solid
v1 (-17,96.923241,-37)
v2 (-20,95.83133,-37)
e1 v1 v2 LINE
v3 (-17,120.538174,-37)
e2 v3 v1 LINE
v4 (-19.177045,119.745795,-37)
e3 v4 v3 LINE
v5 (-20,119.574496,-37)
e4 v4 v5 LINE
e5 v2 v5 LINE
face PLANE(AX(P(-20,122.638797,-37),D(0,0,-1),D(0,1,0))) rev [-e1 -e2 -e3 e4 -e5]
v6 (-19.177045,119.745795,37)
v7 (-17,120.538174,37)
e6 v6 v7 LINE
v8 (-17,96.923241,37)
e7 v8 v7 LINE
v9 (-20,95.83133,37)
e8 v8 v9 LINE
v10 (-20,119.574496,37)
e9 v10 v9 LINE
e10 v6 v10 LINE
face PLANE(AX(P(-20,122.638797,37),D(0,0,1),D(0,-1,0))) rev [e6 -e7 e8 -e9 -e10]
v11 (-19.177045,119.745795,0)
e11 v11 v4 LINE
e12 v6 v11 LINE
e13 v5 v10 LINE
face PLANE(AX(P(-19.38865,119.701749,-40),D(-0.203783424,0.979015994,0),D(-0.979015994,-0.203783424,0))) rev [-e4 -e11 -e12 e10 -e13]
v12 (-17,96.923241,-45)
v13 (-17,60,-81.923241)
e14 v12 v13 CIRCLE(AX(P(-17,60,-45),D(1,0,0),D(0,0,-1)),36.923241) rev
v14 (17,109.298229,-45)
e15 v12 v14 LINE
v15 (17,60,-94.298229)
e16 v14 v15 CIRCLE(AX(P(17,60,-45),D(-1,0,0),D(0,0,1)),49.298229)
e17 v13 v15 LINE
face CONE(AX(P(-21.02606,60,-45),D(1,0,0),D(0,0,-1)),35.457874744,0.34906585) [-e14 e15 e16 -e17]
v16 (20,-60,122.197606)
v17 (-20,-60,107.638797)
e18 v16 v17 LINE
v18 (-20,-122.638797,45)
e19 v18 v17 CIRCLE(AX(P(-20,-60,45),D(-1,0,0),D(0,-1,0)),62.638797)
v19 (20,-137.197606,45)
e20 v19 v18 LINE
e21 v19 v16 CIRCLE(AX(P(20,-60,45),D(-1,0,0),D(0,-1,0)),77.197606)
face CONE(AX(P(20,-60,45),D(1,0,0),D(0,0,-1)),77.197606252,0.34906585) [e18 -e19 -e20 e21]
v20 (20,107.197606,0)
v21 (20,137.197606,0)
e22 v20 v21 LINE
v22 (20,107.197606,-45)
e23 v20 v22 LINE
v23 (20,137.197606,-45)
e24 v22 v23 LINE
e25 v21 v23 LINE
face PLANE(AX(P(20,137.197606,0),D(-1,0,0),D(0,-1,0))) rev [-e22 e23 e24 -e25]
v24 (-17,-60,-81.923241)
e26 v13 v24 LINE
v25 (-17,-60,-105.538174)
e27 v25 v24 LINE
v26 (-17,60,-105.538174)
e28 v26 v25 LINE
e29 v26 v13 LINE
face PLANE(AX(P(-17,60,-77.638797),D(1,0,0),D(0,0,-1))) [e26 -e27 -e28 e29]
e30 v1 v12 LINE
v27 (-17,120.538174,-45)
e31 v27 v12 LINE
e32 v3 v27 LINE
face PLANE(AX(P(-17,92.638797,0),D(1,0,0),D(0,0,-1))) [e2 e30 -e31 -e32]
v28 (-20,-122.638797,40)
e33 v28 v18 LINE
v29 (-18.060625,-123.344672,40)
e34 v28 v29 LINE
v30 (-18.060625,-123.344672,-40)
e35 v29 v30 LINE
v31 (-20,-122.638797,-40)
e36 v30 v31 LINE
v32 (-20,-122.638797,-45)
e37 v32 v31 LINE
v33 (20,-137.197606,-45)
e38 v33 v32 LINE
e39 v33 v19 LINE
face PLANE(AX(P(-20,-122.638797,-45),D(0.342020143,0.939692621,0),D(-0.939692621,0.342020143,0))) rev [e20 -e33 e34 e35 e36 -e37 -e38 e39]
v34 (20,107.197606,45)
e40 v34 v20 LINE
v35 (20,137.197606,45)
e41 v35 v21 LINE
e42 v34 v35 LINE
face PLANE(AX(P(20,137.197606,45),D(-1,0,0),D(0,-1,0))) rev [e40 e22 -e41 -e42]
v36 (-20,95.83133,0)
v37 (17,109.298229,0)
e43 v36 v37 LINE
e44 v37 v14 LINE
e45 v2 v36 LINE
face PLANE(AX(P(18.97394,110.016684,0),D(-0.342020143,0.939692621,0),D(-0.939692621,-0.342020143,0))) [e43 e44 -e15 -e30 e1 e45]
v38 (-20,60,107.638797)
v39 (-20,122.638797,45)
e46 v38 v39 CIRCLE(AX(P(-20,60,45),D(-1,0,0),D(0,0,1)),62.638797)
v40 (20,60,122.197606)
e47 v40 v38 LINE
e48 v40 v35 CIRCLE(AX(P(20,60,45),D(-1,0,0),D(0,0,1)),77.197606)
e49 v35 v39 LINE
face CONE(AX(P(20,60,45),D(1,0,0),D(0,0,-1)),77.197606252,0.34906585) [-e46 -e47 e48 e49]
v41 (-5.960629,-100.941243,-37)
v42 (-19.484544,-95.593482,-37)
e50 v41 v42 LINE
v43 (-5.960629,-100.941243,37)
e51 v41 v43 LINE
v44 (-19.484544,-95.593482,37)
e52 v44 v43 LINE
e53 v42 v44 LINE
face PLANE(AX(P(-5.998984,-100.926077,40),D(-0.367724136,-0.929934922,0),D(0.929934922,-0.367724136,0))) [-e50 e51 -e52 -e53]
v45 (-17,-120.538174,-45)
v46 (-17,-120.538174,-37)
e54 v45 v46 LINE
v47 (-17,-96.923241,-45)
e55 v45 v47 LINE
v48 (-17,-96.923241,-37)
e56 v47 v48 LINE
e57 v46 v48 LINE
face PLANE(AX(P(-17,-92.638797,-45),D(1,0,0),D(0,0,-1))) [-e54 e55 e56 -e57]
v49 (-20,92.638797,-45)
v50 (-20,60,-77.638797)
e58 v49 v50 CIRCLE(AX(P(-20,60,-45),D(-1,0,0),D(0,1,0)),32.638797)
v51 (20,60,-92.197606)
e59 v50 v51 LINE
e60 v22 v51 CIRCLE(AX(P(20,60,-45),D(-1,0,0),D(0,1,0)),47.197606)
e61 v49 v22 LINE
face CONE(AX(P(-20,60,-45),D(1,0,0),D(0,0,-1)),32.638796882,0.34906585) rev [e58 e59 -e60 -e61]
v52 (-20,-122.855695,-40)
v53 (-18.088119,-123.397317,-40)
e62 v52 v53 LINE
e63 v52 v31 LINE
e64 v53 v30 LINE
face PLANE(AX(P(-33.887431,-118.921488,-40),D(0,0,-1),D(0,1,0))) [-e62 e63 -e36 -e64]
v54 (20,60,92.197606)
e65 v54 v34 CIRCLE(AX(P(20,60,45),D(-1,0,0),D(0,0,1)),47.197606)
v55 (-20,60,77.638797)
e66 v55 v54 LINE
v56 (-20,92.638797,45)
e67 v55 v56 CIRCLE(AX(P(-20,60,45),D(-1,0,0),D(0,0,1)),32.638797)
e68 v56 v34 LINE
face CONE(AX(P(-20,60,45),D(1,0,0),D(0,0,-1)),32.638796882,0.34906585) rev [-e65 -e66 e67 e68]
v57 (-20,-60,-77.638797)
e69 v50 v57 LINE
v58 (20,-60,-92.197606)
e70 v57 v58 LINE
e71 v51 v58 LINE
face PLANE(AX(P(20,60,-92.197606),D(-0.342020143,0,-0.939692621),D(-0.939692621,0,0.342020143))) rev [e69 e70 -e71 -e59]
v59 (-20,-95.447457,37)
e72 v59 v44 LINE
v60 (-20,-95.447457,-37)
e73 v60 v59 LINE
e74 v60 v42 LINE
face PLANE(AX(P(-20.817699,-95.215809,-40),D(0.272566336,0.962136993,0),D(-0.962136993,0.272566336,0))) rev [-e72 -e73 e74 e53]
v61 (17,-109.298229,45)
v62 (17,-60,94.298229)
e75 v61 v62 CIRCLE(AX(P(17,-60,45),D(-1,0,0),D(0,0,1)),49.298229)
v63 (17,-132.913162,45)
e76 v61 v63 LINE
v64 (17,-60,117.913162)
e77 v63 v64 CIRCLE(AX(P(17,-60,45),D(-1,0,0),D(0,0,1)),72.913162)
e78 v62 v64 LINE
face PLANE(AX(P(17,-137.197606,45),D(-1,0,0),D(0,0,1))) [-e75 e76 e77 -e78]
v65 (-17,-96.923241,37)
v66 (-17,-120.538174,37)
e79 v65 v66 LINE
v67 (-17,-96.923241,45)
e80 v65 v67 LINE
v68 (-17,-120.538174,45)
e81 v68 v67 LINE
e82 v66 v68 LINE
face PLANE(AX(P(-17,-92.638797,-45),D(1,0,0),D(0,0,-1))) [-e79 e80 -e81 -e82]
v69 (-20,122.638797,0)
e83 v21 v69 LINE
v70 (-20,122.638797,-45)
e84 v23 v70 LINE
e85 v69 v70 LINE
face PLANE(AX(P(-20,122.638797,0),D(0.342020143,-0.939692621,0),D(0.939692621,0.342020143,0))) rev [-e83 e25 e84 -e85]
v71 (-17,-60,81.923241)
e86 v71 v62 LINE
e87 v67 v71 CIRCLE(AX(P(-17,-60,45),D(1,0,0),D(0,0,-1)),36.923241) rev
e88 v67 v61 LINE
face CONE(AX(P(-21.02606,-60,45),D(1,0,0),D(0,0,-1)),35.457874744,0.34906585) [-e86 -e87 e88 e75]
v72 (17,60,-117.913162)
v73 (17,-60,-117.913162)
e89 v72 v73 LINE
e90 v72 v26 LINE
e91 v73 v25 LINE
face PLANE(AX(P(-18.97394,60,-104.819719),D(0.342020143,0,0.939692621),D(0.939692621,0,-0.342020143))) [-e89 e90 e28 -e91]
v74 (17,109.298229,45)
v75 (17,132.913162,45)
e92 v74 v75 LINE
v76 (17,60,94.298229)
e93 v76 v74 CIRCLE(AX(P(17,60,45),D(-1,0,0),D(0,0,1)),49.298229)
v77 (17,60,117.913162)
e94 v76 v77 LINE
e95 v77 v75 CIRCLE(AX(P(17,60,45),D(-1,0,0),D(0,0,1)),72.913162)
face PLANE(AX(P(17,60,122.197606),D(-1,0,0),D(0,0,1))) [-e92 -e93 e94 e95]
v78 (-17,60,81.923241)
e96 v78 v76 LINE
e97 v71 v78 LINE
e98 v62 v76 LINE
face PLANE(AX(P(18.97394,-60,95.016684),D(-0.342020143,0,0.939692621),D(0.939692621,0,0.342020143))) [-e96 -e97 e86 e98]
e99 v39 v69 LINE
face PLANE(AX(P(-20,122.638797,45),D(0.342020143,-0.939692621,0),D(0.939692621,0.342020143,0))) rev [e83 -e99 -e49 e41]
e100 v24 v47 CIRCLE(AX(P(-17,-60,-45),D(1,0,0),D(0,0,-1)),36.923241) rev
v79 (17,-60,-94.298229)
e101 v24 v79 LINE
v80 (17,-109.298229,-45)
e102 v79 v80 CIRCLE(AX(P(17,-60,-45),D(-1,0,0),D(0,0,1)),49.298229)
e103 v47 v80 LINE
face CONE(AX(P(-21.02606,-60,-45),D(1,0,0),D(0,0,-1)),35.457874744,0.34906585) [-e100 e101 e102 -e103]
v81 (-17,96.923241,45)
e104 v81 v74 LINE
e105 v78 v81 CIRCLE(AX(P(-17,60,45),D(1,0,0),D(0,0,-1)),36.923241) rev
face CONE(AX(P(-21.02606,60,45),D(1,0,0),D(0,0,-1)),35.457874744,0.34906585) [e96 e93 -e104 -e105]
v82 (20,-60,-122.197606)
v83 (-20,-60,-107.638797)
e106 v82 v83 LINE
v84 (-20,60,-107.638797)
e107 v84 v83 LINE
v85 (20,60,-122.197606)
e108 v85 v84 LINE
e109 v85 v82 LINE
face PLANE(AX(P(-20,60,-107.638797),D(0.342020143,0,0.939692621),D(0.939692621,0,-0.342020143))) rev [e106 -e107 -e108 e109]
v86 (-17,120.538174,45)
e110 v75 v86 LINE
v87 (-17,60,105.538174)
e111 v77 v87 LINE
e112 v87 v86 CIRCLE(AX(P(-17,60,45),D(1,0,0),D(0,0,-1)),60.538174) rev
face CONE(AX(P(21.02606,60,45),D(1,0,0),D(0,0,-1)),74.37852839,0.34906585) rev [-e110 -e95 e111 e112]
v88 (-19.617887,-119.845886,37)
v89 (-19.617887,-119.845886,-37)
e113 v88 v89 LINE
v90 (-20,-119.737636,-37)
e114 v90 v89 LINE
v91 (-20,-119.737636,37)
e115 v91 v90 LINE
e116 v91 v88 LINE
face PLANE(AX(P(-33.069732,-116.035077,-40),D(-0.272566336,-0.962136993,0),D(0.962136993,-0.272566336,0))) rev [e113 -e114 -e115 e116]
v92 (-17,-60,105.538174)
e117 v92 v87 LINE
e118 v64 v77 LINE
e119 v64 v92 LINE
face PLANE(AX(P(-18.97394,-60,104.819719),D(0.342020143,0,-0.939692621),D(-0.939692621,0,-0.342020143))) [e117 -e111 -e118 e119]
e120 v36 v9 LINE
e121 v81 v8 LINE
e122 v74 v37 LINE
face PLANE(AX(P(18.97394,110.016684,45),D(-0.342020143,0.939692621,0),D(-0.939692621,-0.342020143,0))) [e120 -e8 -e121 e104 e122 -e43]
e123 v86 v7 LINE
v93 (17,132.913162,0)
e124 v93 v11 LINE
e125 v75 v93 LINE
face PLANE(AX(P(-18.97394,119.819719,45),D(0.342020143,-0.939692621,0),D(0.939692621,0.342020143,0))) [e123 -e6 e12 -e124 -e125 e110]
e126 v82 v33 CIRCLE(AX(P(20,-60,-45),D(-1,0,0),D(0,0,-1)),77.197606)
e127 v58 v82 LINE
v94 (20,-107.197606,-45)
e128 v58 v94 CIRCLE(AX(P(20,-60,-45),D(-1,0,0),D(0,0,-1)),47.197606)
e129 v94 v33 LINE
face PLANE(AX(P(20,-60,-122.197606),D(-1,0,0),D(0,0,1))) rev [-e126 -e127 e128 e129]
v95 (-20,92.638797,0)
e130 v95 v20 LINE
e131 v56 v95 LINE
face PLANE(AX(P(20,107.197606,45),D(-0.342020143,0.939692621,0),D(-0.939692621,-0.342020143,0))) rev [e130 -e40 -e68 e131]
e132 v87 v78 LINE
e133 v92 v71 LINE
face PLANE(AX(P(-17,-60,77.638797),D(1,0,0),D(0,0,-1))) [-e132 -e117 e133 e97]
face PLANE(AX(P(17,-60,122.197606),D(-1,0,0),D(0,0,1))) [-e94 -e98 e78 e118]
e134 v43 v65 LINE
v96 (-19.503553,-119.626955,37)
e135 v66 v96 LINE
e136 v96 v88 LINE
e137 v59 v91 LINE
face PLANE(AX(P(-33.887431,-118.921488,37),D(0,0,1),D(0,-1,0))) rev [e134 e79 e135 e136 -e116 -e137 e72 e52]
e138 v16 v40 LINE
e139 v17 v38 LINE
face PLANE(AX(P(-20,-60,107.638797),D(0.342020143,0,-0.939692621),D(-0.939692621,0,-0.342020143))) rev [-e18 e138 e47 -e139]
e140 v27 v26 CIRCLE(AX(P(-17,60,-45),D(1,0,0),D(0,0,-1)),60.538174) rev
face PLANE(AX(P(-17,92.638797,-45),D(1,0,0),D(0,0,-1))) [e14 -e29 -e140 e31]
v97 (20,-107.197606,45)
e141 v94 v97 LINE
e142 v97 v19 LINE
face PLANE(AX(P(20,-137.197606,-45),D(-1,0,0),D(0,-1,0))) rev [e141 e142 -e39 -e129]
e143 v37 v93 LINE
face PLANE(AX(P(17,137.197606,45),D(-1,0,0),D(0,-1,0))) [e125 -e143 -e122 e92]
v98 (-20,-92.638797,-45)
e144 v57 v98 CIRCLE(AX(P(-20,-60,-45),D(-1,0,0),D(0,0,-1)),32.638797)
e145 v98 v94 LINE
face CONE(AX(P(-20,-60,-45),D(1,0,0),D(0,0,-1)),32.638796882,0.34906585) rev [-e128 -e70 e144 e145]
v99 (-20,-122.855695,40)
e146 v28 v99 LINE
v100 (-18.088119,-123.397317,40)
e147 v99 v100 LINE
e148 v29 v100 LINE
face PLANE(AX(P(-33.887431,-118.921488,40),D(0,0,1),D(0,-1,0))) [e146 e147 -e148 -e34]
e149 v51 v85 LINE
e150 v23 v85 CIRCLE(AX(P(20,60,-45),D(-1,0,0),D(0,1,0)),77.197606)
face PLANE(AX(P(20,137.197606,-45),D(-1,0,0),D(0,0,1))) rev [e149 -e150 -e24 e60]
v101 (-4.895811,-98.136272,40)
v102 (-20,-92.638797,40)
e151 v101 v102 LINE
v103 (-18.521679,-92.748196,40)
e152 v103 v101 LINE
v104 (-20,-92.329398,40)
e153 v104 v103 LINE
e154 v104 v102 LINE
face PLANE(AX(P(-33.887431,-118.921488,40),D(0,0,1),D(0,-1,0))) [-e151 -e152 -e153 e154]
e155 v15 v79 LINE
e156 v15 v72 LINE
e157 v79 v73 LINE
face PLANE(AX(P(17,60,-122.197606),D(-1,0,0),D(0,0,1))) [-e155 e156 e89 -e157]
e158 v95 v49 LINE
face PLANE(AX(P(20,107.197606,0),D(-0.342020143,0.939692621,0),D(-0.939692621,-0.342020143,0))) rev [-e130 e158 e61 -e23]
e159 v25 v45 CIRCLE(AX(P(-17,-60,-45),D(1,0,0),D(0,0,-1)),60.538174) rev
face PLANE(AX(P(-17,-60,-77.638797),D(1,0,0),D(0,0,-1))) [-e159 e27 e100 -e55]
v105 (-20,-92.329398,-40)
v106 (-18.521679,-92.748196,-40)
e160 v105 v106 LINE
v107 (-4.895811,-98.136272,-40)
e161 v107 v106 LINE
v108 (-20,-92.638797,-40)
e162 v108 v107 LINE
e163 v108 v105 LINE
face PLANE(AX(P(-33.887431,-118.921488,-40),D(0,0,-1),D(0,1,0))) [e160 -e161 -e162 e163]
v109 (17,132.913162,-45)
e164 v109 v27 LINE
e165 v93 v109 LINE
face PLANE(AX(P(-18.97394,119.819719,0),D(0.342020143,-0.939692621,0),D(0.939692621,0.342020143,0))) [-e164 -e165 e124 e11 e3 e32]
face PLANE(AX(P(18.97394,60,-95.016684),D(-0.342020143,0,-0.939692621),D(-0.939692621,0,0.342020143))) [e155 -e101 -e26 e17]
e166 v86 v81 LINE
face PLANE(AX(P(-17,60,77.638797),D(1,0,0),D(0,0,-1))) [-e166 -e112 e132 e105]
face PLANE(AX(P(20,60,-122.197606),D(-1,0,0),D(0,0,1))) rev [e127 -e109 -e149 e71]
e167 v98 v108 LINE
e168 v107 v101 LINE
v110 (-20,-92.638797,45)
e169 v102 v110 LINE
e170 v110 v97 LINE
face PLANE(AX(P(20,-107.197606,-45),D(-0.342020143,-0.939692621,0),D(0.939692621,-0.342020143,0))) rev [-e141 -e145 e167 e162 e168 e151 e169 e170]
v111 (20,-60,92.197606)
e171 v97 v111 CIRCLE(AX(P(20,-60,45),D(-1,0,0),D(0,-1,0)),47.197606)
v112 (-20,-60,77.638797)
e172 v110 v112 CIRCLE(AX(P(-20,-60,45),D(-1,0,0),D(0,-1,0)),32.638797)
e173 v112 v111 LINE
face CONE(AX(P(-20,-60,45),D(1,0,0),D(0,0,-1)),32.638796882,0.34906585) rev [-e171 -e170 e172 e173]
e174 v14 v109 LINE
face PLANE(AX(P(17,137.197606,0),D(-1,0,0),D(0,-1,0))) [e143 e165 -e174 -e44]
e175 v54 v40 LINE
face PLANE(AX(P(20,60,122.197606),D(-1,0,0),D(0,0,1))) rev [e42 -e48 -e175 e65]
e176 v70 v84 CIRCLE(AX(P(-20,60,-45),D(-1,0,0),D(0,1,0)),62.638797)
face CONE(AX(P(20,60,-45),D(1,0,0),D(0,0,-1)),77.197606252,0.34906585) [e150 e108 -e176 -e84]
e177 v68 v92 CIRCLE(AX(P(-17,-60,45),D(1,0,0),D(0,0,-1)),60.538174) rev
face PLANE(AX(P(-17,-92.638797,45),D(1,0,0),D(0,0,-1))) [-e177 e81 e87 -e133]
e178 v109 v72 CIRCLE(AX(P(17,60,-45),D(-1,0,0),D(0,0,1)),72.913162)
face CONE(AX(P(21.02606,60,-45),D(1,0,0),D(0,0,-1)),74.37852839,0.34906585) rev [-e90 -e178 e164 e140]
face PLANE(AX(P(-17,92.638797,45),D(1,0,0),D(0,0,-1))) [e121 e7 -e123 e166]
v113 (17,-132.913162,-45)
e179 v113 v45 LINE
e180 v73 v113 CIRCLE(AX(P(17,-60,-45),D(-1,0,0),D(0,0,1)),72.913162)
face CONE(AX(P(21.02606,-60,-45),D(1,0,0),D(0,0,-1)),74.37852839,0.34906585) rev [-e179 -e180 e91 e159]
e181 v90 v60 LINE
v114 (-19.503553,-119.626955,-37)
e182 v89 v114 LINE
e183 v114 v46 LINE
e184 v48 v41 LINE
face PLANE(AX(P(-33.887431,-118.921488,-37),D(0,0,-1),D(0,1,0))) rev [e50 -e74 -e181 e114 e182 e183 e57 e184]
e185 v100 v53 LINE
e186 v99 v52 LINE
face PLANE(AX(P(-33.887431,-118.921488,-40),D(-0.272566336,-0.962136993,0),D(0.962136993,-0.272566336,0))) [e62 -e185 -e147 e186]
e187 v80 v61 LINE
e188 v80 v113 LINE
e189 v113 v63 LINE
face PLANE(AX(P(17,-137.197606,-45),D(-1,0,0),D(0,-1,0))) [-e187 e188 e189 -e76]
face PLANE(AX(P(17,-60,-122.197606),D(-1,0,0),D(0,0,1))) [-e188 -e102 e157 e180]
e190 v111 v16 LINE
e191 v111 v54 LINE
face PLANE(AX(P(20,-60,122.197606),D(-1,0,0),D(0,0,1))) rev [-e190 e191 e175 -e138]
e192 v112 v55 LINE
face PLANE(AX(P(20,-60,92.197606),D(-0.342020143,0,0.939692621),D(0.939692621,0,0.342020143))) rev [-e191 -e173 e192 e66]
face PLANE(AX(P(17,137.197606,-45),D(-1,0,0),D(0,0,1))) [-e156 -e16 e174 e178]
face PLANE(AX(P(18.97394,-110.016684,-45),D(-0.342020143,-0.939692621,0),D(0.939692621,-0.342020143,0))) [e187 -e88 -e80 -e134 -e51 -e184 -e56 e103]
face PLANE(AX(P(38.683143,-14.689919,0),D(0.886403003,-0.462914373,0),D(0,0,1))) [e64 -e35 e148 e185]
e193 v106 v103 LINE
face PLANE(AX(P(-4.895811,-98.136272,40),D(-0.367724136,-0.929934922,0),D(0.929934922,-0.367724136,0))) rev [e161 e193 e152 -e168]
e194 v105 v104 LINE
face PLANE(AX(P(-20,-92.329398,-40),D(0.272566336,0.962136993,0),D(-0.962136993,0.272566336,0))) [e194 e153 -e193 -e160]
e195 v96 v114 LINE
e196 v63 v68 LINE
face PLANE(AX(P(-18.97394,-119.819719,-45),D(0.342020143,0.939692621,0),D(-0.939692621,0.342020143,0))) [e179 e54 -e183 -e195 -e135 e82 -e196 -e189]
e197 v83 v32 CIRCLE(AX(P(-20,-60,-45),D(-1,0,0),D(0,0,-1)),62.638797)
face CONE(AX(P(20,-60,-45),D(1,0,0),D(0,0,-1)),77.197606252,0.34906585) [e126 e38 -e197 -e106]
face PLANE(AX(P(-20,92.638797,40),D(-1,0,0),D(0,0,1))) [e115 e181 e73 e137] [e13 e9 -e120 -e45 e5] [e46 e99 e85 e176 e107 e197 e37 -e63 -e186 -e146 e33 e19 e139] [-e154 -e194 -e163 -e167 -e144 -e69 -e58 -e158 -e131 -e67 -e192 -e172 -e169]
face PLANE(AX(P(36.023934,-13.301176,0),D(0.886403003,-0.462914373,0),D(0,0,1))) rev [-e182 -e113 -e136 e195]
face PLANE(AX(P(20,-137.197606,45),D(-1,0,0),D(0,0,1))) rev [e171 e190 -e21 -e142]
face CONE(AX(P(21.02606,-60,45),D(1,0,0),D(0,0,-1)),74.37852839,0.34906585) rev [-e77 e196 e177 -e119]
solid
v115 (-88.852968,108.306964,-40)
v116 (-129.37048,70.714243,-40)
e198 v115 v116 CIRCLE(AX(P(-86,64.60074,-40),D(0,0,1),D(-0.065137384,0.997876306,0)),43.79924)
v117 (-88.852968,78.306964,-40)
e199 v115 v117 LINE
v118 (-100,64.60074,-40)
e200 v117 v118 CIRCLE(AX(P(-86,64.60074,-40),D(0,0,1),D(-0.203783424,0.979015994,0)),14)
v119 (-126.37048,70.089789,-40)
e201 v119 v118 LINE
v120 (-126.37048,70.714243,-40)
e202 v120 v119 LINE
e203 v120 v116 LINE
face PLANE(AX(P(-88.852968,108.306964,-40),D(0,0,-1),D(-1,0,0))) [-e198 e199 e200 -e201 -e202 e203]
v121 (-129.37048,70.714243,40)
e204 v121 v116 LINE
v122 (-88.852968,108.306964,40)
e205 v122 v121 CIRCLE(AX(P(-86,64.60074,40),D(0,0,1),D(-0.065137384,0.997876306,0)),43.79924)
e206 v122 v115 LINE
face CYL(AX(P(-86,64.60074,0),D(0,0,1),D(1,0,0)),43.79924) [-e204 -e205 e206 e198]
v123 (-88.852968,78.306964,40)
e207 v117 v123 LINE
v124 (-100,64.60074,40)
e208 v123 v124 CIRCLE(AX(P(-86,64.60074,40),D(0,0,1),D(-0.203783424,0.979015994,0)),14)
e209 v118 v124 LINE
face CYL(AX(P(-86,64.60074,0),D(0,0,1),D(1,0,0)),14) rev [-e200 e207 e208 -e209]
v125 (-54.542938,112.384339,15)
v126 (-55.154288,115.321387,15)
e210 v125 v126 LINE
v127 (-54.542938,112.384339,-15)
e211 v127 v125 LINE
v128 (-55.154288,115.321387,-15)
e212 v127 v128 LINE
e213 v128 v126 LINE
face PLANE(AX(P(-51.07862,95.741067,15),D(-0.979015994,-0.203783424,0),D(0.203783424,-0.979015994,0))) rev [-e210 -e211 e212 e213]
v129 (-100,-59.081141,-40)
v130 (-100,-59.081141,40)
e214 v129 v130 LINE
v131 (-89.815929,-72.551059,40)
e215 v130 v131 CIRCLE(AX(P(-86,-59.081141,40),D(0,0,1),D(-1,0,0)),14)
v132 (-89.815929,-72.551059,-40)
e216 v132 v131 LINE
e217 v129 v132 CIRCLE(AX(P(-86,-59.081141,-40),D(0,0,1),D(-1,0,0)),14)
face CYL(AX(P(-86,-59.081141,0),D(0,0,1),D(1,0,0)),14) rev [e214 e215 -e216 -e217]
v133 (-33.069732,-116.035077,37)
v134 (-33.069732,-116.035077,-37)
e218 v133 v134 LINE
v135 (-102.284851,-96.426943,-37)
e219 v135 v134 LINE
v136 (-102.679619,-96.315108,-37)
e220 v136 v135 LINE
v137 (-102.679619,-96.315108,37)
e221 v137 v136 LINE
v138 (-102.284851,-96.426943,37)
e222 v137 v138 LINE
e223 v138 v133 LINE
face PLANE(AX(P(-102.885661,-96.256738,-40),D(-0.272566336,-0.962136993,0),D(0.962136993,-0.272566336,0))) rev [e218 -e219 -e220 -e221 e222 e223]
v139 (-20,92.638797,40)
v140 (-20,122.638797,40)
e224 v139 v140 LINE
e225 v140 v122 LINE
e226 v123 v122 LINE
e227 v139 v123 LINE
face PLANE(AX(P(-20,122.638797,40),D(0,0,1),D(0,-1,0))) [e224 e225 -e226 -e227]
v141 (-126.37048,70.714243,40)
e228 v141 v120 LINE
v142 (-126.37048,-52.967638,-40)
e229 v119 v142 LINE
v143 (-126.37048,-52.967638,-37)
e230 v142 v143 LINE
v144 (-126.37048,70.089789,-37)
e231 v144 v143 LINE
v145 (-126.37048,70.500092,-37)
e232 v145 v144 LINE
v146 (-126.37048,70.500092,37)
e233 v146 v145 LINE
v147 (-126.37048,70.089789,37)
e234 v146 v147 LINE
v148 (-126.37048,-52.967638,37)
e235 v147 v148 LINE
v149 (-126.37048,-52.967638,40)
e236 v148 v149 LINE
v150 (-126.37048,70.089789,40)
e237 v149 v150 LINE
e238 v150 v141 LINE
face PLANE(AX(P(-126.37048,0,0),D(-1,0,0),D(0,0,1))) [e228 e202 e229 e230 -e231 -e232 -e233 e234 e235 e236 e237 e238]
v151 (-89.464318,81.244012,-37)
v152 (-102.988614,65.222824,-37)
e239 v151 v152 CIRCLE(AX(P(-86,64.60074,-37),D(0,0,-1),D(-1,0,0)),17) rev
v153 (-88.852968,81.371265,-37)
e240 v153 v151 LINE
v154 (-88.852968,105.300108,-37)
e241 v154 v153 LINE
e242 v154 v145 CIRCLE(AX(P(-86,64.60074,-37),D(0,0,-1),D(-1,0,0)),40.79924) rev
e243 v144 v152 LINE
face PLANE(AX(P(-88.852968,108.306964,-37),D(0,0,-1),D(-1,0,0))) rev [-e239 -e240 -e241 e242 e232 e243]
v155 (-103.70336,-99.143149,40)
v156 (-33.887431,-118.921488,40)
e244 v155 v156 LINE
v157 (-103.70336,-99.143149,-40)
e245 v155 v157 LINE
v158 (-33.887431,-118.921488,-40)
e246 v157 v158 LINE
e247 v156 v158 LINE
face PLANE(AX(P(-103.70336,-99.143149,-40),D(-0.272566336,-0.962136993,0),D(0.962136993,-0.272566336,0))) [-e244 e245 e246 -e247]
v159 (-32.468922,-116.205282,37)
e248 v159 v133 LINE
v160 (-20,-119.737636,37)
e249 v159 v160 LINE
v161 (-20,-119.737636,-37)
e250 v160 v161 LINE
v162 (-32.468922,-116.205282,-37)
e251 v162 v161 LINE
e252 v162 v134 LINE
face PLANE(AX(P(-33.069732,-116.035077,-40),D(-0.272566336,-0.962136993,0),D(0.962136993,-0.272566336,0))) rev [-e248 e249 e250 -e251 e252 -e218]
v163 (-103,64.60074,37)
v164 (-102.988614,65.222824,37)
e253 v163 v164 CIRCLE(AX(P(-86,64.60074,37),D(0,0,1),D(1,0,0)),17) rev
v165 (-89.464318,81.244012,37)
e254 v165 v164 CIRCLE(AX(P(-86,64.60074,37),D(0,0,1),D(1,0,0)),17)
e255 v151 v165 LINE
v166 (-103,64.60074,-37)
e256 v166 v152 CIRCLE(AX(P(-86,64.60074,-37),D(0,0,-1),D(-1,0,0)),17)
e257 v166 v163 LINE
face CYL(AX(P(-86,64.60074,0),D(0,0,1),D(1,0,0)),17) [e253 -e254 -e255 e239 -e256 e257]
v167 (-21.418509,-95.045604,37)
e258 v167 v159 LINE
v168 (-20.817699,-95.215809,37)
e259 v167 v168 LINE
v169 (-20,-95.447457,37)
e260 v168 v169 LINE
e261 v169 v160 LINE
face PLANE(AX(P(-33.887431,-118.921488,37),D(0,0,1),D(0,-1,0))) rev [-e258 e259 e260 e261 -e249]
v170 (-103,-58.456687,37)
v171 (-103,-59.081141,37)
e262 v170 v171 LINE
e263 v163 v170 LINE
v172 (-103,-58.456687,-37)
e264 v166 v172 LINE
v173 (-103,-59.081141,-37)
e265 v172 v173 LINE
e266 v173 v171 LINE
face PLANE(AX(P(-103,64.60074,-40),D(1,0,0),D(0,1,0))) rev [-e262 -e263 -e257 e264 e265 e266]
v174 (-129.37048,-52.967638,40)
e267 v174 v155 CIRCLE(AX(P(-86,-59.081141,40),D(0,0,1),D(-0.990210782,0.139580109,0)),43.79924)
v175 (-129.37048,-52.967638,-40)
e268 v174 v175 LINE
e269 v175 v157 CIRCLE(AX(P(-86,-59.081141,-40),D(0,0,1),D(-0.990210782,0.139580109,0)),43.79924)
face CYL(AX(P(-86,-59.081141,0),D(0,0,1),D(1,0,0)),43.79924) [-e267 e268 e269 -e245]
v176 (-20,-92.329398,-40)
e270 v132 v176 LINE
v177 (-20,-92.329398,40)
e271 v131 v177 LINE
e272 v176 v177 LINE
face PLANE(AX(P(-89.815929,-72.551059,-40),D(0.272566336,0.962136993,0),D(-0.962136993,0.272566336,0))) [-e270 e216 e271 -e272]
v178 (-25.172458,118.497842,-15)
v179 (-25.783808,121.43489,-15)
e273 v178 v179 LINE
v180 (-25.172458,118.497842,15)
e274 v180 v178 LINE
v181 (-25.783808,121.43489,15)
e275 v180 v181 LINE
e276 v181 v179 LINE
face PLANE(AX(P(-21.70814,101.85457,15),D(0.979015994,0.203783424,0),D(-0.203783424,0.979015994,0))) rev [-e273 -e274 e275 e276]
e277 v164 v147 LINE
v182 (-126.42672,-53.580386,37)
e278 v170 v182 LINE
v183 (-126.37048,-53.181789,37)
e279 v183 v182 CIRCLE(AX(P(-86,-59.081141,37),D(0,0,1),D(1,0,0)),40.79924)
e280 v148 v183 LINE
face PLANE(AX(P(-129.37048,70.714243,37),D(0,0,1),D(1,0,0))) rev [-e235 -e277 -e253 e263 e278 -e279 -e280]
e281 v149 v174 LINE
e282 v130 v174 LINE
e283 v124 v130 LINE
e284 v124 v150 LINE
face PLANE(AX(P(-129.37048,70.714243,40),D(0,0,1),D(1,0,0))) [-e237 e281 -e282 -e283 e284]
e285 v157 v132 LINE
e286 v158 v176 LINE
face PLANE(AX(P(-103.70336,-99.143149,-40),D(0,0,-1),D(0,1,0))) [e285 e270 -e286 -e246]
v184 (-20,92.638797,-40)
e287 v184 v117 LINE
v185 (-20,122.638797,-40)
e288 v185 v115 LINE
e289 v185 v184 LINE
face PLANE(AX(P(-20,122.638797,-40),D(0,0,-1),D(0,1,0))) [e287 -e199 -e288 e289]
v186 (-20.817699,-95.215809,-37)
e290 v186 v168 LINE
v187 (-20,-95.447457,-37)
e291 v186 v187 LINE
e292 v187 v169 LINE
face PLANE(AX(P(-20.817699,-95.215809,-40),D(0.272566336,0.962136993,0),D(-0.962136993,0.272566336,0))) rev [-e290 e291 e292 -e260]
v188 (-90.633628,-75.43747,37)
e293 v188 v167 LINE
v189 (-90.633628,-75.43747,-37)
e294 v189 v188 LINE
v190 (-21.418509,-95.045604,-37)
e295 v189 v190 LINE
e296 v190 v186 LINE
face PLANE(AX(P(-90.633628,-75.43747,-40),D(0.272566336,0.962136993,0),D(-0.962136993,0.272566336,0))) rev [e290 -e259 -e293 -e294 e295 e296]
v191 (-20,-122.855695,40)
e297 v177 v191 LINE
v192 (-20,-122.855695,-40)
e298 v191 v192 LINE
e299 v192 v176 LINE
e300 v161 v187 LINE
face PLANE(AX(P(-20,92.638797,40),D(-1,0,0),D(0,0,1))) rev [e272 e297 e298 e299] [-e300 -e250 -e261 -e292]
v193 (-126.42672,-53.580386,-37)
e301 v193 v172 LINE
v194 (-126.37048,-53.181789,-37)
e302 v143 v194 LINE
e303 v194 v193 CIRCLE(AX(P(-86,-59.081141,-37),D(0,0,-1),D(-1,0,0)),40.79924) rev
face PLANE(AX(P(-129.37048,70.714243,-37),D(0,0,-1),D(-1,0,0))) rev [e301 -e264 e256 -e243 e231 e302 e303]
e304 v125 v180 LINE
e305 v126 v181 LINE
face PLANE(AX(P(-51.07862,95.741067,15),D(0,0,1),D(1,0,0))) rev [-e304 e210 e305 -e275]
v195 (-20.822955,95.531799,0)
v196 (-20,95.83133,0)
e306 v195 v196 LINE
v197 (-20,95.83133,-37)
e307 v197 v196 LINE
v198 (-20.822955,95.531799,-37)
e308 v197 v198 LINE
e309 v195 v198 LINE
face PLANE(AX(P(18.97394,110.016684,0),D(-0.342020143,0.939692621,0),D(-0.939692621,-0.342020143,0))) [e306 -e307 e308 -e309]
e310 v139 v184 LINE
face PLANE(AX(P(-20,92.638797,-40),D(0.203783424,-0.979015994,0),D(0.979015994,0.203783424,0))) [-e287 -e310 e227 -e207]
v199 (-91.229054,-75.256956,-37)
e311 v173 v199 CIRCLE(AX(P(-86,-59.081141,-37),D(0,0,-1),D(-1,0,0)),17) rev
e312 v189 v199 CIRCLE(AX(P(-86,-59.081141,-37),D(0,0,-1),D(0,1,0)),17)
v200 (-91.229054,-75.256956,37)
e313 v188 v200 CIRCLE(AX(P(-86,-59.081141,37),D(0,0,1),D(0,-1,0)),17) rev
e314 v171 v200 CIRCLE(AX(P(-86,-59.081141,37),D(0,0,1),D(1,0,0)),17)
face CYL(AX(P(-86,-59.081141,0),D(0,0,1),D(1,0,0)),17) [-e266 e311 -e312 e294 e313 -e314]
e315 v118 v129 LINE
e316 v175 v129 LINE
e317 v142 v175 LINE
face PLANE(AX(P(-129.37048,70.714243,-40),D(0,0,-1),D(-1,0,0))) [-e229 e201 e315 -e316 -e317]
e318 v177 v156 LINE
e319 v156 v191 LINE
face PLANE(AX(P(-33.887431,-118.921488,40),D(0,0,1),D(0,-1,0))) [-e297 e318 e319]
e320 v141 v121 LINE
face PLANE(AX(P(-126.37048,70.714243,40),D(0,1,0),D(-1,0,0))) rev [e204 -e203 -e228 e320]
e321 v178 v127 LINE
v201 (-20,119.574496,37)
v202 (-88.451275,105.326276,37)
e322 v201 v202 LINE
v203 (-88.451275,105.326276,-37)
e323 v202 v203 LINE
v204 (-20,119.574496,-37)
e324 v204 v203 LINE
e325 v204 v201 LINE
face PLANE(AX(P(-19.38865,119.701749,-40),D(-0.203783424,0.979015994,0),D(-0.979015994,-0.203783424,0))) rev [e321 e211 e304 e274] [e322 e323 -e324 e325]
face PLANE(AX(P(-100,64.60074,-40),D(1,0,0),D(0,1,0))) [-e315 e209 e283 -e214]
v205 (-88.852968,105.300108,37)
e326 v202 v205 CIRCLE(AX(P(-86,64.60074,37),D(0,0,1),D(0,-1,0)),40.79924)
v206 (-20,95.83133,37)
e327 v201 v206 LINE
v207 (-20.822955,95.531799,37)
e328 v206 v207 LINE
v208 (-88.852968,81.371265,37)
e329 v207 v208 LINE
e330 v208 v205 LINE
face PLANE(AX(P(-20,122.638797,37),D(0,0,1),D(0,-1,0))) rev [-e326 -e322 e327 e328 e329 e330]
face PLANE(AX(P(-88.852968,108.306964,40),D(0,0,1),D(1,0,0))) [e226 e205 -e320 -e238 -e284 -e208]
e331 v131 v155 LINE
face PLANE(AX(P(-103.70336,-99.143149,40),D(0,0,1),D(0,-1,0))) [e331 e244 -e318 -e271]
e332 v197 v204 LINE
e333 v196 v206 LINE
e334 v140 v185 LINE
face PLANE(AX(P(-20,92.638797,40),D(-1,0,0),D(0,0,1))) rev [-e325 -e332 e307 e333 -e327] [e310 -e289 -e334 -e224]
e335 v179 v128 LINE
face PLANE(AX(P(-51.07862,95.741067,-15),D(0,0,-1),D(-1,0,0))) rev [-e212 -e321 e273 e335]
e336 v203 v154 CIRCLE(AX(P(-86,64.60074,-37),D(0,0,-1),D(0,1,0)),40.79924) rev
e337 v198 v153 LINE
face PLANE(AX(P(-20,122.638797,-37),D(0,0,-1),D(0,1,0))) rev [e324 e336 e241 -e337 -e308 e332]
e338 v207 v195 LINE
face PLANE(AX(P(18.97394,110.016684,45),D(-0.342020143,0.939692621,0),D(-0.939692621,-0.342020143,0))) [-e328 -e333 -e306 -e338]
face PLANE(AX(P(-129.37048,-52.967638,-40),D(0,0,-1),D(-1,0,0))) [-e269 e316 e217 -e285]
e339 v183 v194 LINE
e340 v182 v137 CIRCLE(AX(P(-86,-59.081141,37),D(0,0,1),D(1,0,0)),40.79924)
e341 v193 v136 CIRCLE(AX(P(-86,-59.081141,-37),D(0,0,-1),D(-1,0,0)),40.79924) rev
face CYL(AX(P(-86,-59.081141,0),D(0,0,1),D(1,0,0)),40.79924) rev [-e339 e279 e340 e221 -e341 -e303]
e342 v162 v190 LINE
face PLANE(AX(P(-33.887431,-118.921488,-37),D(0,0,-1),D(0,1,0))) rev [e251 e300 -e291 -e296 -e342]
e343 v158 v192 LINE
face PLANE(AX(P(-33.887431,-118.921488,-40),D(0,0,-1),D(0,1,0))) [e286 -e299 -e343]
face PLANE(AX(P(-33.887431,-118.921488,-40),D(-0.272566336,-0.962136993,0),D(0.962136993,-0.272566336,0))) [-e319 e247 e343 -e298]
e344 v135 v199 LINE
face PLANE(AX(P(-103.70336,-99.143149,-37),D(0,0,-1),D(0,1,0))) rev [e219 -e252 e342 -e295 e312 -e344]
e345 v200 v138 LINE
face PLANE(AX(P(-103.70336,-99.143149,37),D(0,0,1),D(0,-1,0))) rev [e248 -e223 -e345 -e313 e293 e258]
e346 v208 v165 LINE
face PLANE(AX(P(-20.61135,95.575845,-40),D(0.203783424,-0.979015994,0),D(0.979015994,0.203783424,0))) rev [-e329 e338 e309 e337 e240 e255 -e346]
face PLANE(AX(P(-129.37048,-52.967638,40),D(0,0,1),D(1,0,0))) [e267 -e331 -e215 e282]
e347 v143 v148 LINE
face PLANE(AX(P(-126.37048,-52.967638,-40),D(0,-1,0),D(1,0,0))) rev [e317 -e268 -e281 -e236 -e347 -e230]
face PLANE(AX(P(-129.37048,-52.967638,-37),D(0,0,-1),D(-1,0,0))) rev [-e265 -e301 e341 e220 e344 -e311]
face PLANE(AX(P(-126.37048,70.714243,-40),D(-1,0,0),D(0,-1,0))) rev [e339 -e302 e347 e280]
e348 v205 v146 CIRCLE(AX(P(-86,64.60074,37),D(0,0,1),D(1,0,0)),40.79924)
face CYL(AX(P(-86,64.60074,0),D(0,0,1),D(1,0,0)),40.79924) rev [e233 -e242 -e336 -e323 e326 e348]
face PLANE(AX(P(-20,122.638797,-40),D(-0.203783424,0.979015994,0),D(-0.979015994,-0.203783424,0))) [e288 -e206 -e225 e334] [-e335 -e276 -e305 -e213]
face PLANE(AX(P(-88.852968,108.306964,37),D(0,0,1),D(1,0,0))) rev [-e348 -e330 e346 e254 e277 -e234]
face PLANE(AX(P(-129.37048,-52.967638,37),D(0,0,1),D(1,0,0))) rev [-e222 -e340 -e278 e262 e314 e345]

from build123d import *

# Parameters (mm, degrees)
SKETCH3_W          = 80
SKETCH3_H          = 30
SKETCH9_W          = 80
SKETCH9_H          = 1.501624929
CUT_EXTRUDE1_DEPTH = 20
CUT_EXTRUDE1_TAPER = -6
SHELL10_START      = -37
SHELL10_DEPTH      = 74
SHELL10_START_2    = -45
SHELL10_2_DEPTH    = 90
SKETCH10_W         = 30
SKETCH10_H         = 30
CUT_EXTRUDE3_DEPTH = 20
SKETCH12_W         = 80
SKETCH12_H         = 123.681881054
CUT_EXTRUDE6_DEPTH = 3
SPLIT1_START       = -40
SPLIT1_DEPTH       = 80
SPLIT1_2_DEPTH     = 80
SPLIT1_3_DEPTH     = 3
SPLIT1_START_2     = 37
SPLIT1_4_DEPTH     = 3
SPLIT1_START_3     = -37
SPLIT1_5_DEPTH     = 22
SPLIT1_START_4     = 15
SPLIT1_6_DEPTH     = 22


with BuildPart() as part:
    # Sweep1: sweep along a path in Sketch1
    with BuildLine(Plane(origin=(0, 0, 0), x_dir=(0, 0, -1), z_dir=(1, 0, 0))) as sweep1_path:
        Line((-45, 100), (45, 100))
        ThreePointArc((45, 100), (73.284271247, 88.284271247), (85, 60))
        Line((85, 60), (85, -60))
        ThreePointArc((85, -60), (73.284271247, -88.284271247), (45, -100))
        Line((45, -100), (-45, -100))
        ThreePointArc((-45, -100), (-73.284271247, -88.284271247), (-85, -60))
        Line((-85, -60), (-85, 60))
        ThreePointArc((-85, 60), (-73.284271247, 88.284271247), (-45, 100))
    # Sketch2 → Sweep1 (sweep)
    with BuildSketch(Plane.XY):
        Polygon((-20, 92.638796882), (-20, 122.638796882), (20, 137.197606252), (20, 107.197606252), align=None)
    sweep(path=sweep1_path.line)

    # Sweep2: sweep along a path in Sketch4
    with BuildLine(Plane.XY) as sweep2_path:
        Line((-20, 92.638796882), (-88.852967931, 78.306964082))
        ThreePointArc((-88.852967931, 78.306964082), (-96.861435242, 73.43415539), (-100, 64.600740168))
        Line((-100, 64.600740168), (-100, -59.081140886))
        ThreePointArc((-100, -59.081140886), (-97.167430364, -67.524392573), (-89.815928706, -72.551058781))
        Line((-89.815928706, -72.551058781), (-20, -92.32939808))
        Line((-20, -92.32939808), (-4.200687465, -96.805227161))
    # Sketch3 → Sweep2 (sweep)
    with BuildSketch(Plane.ZY.offset(20)):
        with Locations((0, 107.638796882)):
            Rectangle(SKETCH3_W, SKETCH3_H)
    sweep(path=sweep2_path.line)

    # Sketch9 → Cut-Extrude1 (cut)
    with BuildSketch(Plane(origin=(36.421438719, -19.020702104, 0), x_dir=(0, 0, -1), z_dir=(0.88640300284302, -0.4629143728065455, 0))):
        with Locations((0, -88.503815115)):
            Rectangle(SKETCH9_W, SKETCH9_H)
    extrude(amount=-CUT_EXTRUDE1_DEPTH, taper=CUT_EXTRUDE1_TAPER, mode=Mode.SUBTRACT)

    # Shell10: read off the stored shape, not the designer's step
    # Shell10 outline → Shell10 (cut)
    with BuildSketch(Plane.XY.offset(SHELL10_START)):
        with BuildLine():
            Line((-20.822955032, 95.531799063), (17, 109.298228867))
            Line((17, 109.298228867), (17, 132.913162232))
            Line((17, 132.913162232), (-19.177044968, 119.7457947))
            Line((-19.177044968, 119.7457947), (-88.451274667, 105.326275728))
            ThreePointArc((-88.451274667, 105.326275728), (-113.597851914, 94.649643041), (-126.370479816, 70.500092129))
            Line((-126.370479816, 70.500092129), (-126.370479816, -53.181788924))
            ThreePointArc((-126.370479816, -53.181788924), (-121.760302537, -78.722392286), (-102.679618525, -96.315108173))
            Line((-102.679618525, -96.315108173), (-33.069732176, -116.035077188))
            Line((-33.069732176, -116.035077188), (-19.61788718, -119.845885974))
            Line((-19.61788718, -119.845885974), (-19.503553091, -119.626955462))
            Line((-19.503553091, -119.626955462), (17, -132.913162232))
            Line((17, -132.913162232), (17, -109.298228867))
            Line((17, -109.298228867), (-5.960628872, -100.941243398))
            Line((-5.960628872, -100.941243398), (-19.484544128, -95.593482034))
            Line((-19.484544128, -95.593482034), (-20.817699008, -95.215809058))
            Line((-20.817699008, -95.215809058), (-90.633627714, -75.437469759))
            ThreePointArc((-90.633627714, -75.437469759), (-99.560451157, -69.333660792), (-103, -59.081140886))
            Line((-103, -59.081140886), (-103, 64.600740168))
            ThreePointArc((-103, 64.600740168), (-99.188885651, 75.32703008), (-89.464318202, 81.244012064))
            Line((-89.464318202, 81.244012064), (-20.822955032, 95.531799063))
        make_face()
    extrude(amount=SHELL10_DEPTH, mode=Mode.SUBTRACT)

    # Shell10 2 outline → Shell10 2 (cut)
    with BuildSketch(Plane.XY.offset(SHELL10_START_2)):
        Polygon((-17, 120.538174267), (-17, 96.923240902), (17, 109.298228867), (17, 132.913162232), align=None)
        Polygon((17, -109.298228867), (-17, -96.923240902), (-17, -120.538174267), (17, -132.913162232), align=None)
    extrude(amount=SHELL10_2_DEPTH, mode=Mode.SUBTRACT)

    # Shell10 3: loft between two sections, ruled curve by curve
    shell10_3_from = [
        Edge.make_three_point_arc((-17, 60, -105.538174267), (-17, 102.806953545, -87.806953545), (-17, 120.538174267, -45)),
        Edge.make_three_point_arc((-17, 60, -81.923240902), (-17, 86.108674025, -71.108674025), (-17, 96.923240902, -45)),
        Edge.make_three_point_arc((-17, -120.538174267, -45), (-17, -102.806953545, -87.806953545), (-17, -60, -105.538174267)),
        Edge.make_three_point_arc((-17, -96.923240902, -45), (-17, -86.108674025, -71.108674025), (-17, -60, -81.923240902)),
        Edge.make_line((-17, 60, -105.538174267), (-17, -60, -105.538174267)),
        Edge.make_line((-17, -60, -81.923240902), (-17, 60, -81.923240902)),
        Edge.make_line((-17, 96.923240902, -45), (-17, 120.538174267, -45)),
        Edge.make_line((-17, -96.923240902, -45), (-17, -120.538174267, -45)),
    ]
    shell10_3_to = [
        Edge.make_three_point_arc((17, 60, -117.913162232), (17, 111.557391452, -96.557391452), (17, 132.913162232, -45)),
        Edge.make_three_point_arc((17, 60, -94.298228867), (17, 94.859111932, -79.859111932), (17, 109.298228867, -45)),
        Edge.make_three_point_arc((17, -132.913162232, -45), (17, -111.557391452, -96.557391452), (17, -60, -117.913162232)),
        Edge.make_three_point_arc((17, -109.298228867, -45), (17, -94.859111932, -79.859111932), (17, -60, -94.298228867)),
        Edge.make_line((17, 60, -117.913162232), (17, -60, -117.913162232)),
        Edge.make_line((17, -60, -94.298228867), (17, 60, -94.298228867)),
        Edge.make_line((17, 109.298228867, -45), (17, 132.913162232, -45)),
        Edge.make_line((17, -109.298228867, -45), (17, -132.913162232, -45)),
    ]
    shell10_3 = Solid(Shell([*[Face.make_surface_from_curves(shell10_3_from[k], shell10_3_to[k]) for k in range(8)], Face(Wire(shell10_3_from)), Face(Wire(shell10_3_to))]))
    add(shell10_3, mode=Mode.SUBTRACT)

    # Shell10 4: loft between two sections, ruled curve by curve
    shell10_4_from = [
        Edge.make_three_point_arc((-17, -60, 105.538174267), (-17, -102.806953545, 87.806953545), (-17, -120.538174267, 45)),
        Edge.make_three_point_arc((-17, -60, 81.923240902), (-17, -86.108674025, 71.108674025), (-17, -96.923240902, 45)),
        Edge.make_three_point_arc((-17, 120.538174267, 45), (-17, 102.806953545, 87.806953545), (-17, 60, 105.538174267)),
        Edge.make_three_point_arc((-17, 96.923240902, 45), (-17, 86.108674025, 71.108674025), (-17, 60, 81.923240902)),
        Edge.make_line((-17, -60, 105.538174267), (-17, 60, 105.538174267)),
        Edge.make_line((-17, 60, 81.923240902), (-17, -60, 81.923240902)),
        Edge.make_line((-17, -96.923240902, 45), (-17, -120.538174267, 45)),
        Edge.make_line((-17, 96.923240902, 45), (-17, 120.538174267, 45)),
    ]
    shell10_4_to = [
        Edge.make_three_point_arc((17, -60, 117.913162232), (17, -111.557391452, 96.557391452), (17, -132.913162232, 45)),
        Edge.make_three_point_arc((17, -60, 94.298228867), (17, -94.859111932, 79.859111932), (17, -109.298228867, 45)),
        Edge.make_three_point_arc((17, 132.913162232, 45), (17, 111.557391452, 96.557391452), (17, 60, 117.913162232)),
        Edge.make_three_point_arc((17, 109.298228867, 45), (17, 94.859111932, 79.859111932), (17, 60, 94.298228867)),
        Edge.make_line((17, -60, 117.913162232), (17, 60, 117.913162232)),
        Edge.make_line((17, 60, 94.298228867), (17, -60, 94.298228867)),
        Edge.make_line((17, -109.298228867, 45), (17, -132.913162232, 45)),
        Edge.make_line((17, 109.298228867, 45), (17, 132.913162232, 45)),
    ]
    shell10_4 = Solid(Shell([*[Face.make_surface_from_curves(shell10_4_from[k], shell10_4_to[k]) for k in range(8)], Face(Wire(shell10_4_from)), Face(Wire(shell10_4_to))]))
    add(shell10_4, mode=Mode.SUBTRACT)

    # Sketch10 → Cut-Extrude3 (cut)
    with BuildSketch(Plane(origin=(-25.297880457, 121.53603633, 0), x_dir=(0.9790159938689951, 0.2037834236357412, 0), z_dir=(-0.2037834236357412, 0.9790159938689951, 0))):
        with Locations((-15.49634306, 0)):
            Rectangle(SKETCH10_W, SKETCH10_H)
    extrude(amount=-CUT_EXTRUDE3_DEPTH, mode=Mode.SUBTRACT)

    # Sketch12 → Cut-Extrude6 (cut)
    with BuildSketch(Plane.ZY.offset(129.370479816)):
        with Locations((0, 8.87330235)):
            Rectangle(SKETCH12_W, SKETCH12_H)
    extrude(amount=-CUT_EXTRUDE6_DEPTH, mode=Mode.SUBTRACT)

    # Split1: read off the stored shape, not the designer's step
    # Split1 outline → Split1 (cut)
    with BuildSketch(Plane.XY.offset(SPLIT1_START)):
        with BuildLine():
            Line((-20, -92.32939808), (-89.815928706, -72.551058781))
            ThreePointArc((-89.815928706, -72.551058781), (-97.167430364, -67.524392573), (-100, -59.081140886))
            Line((-100, -59.081140886), (-100, 64.600740168))
            ThreePointArc((-100, 64.600740168), (-96.861435242, 73.43415539), (-88.852967931, 78.306964082))
            Line((-88.852967931, 78.306964082), (-20, 92.638796882))
            Line((-20, 92.638796882), (-20, 122.638796882))
            Line((-20, 122.638796882), (-88.852967931, 108.306964082))
            ThreePointArc((-88.852967931, 108.306964082), (-115.790182146, 96.70865948), (-129.370479816, 70.714242877))
            Line((-129.370479816, 70.714242877), (-126.370479816, 70.714242877))
            Line((-126.370479816, 70.714242877), (-126.370479816, -52.967638177))
            Line((-126.370479816, -52.967638177), (-129.370479816, -52.967638177))
            ThreePointArc((-129.370479816, -52.967638177), (-124.282475377, -80.360838108), (-103.70335989, -99.143148866))
            Line((-103.70335989, -99.143148866), (-33.887431184, -118.921488166))
            Line((-33.887431184, -118.921488166), (-20, -122.855695317))
            Line((-20, -122.855695317), (-20, -92.32939808))
        make_face()
    extrude(amount=SPLIT1_DEPTH, mode=Mode.SUBTRACT)


with BuildPart() as body_2:
    # Split1 2 outline → Split1 2 (new body)
    with BuildSketch(Plane.XY.offset(SPLIT1_START)):
        Polygon((-20, 119.574495564), (-20, 122.638796882), (-25.783808251, 121.434889842), (-25.17245798, 118.49784186), align=None)
        with BuildLine():
            Line((-20, 92.638796882), (-20, 95.831330199))
            Line((-20, 95.831330199), (-20.822955032, 95.531799063))
            Line((-20.822955032, 95.531799063), (-89.464318202, 81.244012064))
            ThreePointArc((-89.464318202, 81.244012064), (-99.188885651, 75.32703008), (-103, 64.600740168))
            Line((-103, 64.600740168), (-103, -59.081140886))
            ThreePointArc((-103, -59.081140886), (-99.560451157, -69.333660792), (-90.633627714, -75.437469759))
            Line((-90.633627714, -75.437469759), (-20.817699008, -95.215809058))
            Line((-20.817699008, -95.215809058), (-20, -95.447457175))
            Line((-20, -95.447457175), (-20, -92.32939808))
            Line((-20, -92.32939808), (-89.815928706, -72.551058781))
            ThreePointArc((-89.815928706, -72.551058781), (-97.167430364, -67.524392573), (-100, -59.081140886))
            Line((-100, -59.081140886), (-100, 64.600740168))
            ThreePointArc((-100, 64.600740168), (-96.861435242, 73.43415539), (-88.852967931, 78.306964082))
            Line((-88.852967931, 78.306964082), (-20, 92.638796882))
        make_face()
        with BuildLine():
            Line((-54.542937796, 112.384339151), (-55.154288067, 115.321387133))
            Line((-55.154288067, 115.321387133), (-88.852967931, 108.306964082))
            ThreePointArc((-88.852967931, 108.306964082), (-115.790182146, 96.70865948), (-129.370479816, 70.714242877))
            Line((-129.370479816, 70.714242877), (-126.370479816, 70.714242877))
            Line((-126.370479816, 70.714242877), (-126.370479816, 70.500092129))
            ThreePointArc((-126.370479816, 70.500092129), (-113.597851914, 94.649643041), (-88.451274667, 105.326275728))
            Line((-88.451274667, 105.326275728), (-54.542937796, 112.384339151))
        make_face()
        with BuildLine():
            Line((-126.370479816, -53.181788924), (-126.370479816, -52.967638177))
            Line((-126.370479816, -52.967638177), (-129.370479816, -52.967638177))
            ThreePointArc((-129.370479816, -52.967638177), (-124.282475377, -80.360838108), (-103.70335989, -99.143148866))
            Line((-103.70335989, -99.143148866), (-33.887431184, -118.921488166))
            Line((-33.887431184, -118.921488166), (-20, -122.855695317))
            Line((-20, -122.855695317), (-20, -119.737636222))
            Line((-20, -119.737636222), (-33.069732176, -116.035077188))
            Line((-33.069732176, -116.035077188), (-102.679618525, -96.315108173))
            ThreePointArc((-102.679618525, -96.315108173), (-121.760302537, -78.722392286), (-126.370479816, -53.181788924))
        make_face()
    extrude(amount=SPLIT1_2_DEPTH)

    # Split1 3 outline → Split1 3 (add)
    with BuildSketch(Plane.XY.offset(SPLIT1_START)):
        with BuildLine():
            Line((-20, 95.831330199), (-20, 119.574495564))
            Line((-20, 119.574495564), (-25.17245798, 118.49784186))
            Line((-25.17245798, 118.49784186), (-25.783808251, 121.434889842))
            Line((-25.783808251, 121.434889842), (-55.154288067, 115.321387133))
            Line((-55.154288067, 115.321387133), (-54.542937796, 112.384339151))
            Line((-54.542937796, 112.384339151), (-88.451274667, 105.326275728))
            ThreePointArc((-88.451274667, 105.326275728), (-113.597851914, 94.649643041), (-126.370479816, 70.500092129))
            Line((-126.370479816, 70.500092129), (-126.370479816, -53.181788924))
            ThreePointArc((-126.370479816, -53.181788924), (-121.760302537, -78.722392286), (-102.679618525, -96.315108173))
            Line((-102.679618525, -96.315108173), (-33.069732176, -116.035077188))
            Line((-33.069732176, -116.035077188), (-20, -119.737636222))
            Line((-20, -119.737636222), (-20, -95.447457175))
            Line((-20, -95.447457175), (-20.817699008, -95.215809058))
            Line((-20.817699008, -95.215809058), (-90.633627714, -75.437469759))
            ThreePointArc((-90.633627714, -75.437469759), (-99.560451157, -69.333660792), (-103, -59.081140886))
            Line((-103, -59.081140886), (-103, 64.600740168))
            ThreePointArc((-103, 64.600740168), (-99.188885651, 75.32703008), (-89.464318202, 81.244012064))
            Line((-89.464318202, 81.244012064), (-20.822955032, 95.531799063))
            Line((-20.822955032, 95.531799063), (-20, 95.831330199))
        make_face()
    extrude(amount=SPLIT1_3_DEPTH)

    # Split1 4 outline → Split1 4 (add)
    with BuildSketch(Plane.XY.offset(SPLIT1_START_2)):
        with BuildLine():
            Line((-20, 95.831330199), (-20, 119.574495564))
            Line((-20, 119.574495564), (-25.17245798, 118.49784186))
            Line((-25.17245798, 118.49784186), (-25.783808251, 121.434889842))
            Line((-25.783808251, 121.434889842), (-55.154288067, 115.321387133))
            Line((-55.154288067, 115.321387133), (-54.542937796, 112.384339151))
            Line((-54.542937796, 112.384339151), (-88.451274667, 105.326275728))
            ThreePointArc((-88.451274667, 105.326275728), (-113.597851914, 94.649643041), (-126.370479816, 70.500092129))
            Line((-126.370479816, 70.500092129), (-126.370479816, -53.181788924))
            ThreePointArc((-126.370479816, -53.181788924), (-121.760302537, -78.722392286), (-102.679618525, -96.315108173))
            Line((-102.679618525, -96.315108173), (-33.069732176, -116.035077188))
            Line((-33.069732176, -116.035077188), (-20, -119.737636222))
            Line((-20, -119.737636222), (-20, -95.447457175))
            Line((-20, -95.447457175), (-20.817699008, -95.215809058))
            Line((-20.817699008, -95.215809058), (-90.633627714, -75.437469759))
            ThreePointArc((-90.633627714, -75.437469759), (-99.560451157, -69.333660792), (-103, -59.081140886))
            Line((-103, -59.081140886), (-103, 64.600740168))
            ThreePointArc((-103, 64.600740168), (-99.188885651, 75.32703008), (-89.464318202, 81.244012064))
            Line((-89.464318202, 81.244012064), (-20.822955032, 95.531799063))
            Line((-20.822955032, 95.531799063), (-20, 95.831330199))
        make_face()
    extrude(amount=SPLIT1_4_DEPTH)

    # Split1 5 outline → Split1 5 (add)
    with BuildSketch(Plane.XY.offset(SPLIT1_START_3)):
        Polygon((-25.17245798, 118.49784186), (-25.783808251, 121.434889842), (-55.154288067, 115.321387133), (-54.542937796, 112.384339151), align=None)
    extrude(amount=SPLIT1_5_DEPTH)

    # Split1 6 outline → Split1 6 (add)
    with BuildSketch(Plane.XY.offset(SPLIT1_START_4)):
        Polygon((-25.17245798, 118.49784186), (-25.783808251, 121.434889842), (-55.154288067, 115.321387133), (-54.542937796, 112.384339151), align=None)
    extrude(amount=SPLIT1_6_DEPTH)


solid = Compound([part.part, body_2.part])
